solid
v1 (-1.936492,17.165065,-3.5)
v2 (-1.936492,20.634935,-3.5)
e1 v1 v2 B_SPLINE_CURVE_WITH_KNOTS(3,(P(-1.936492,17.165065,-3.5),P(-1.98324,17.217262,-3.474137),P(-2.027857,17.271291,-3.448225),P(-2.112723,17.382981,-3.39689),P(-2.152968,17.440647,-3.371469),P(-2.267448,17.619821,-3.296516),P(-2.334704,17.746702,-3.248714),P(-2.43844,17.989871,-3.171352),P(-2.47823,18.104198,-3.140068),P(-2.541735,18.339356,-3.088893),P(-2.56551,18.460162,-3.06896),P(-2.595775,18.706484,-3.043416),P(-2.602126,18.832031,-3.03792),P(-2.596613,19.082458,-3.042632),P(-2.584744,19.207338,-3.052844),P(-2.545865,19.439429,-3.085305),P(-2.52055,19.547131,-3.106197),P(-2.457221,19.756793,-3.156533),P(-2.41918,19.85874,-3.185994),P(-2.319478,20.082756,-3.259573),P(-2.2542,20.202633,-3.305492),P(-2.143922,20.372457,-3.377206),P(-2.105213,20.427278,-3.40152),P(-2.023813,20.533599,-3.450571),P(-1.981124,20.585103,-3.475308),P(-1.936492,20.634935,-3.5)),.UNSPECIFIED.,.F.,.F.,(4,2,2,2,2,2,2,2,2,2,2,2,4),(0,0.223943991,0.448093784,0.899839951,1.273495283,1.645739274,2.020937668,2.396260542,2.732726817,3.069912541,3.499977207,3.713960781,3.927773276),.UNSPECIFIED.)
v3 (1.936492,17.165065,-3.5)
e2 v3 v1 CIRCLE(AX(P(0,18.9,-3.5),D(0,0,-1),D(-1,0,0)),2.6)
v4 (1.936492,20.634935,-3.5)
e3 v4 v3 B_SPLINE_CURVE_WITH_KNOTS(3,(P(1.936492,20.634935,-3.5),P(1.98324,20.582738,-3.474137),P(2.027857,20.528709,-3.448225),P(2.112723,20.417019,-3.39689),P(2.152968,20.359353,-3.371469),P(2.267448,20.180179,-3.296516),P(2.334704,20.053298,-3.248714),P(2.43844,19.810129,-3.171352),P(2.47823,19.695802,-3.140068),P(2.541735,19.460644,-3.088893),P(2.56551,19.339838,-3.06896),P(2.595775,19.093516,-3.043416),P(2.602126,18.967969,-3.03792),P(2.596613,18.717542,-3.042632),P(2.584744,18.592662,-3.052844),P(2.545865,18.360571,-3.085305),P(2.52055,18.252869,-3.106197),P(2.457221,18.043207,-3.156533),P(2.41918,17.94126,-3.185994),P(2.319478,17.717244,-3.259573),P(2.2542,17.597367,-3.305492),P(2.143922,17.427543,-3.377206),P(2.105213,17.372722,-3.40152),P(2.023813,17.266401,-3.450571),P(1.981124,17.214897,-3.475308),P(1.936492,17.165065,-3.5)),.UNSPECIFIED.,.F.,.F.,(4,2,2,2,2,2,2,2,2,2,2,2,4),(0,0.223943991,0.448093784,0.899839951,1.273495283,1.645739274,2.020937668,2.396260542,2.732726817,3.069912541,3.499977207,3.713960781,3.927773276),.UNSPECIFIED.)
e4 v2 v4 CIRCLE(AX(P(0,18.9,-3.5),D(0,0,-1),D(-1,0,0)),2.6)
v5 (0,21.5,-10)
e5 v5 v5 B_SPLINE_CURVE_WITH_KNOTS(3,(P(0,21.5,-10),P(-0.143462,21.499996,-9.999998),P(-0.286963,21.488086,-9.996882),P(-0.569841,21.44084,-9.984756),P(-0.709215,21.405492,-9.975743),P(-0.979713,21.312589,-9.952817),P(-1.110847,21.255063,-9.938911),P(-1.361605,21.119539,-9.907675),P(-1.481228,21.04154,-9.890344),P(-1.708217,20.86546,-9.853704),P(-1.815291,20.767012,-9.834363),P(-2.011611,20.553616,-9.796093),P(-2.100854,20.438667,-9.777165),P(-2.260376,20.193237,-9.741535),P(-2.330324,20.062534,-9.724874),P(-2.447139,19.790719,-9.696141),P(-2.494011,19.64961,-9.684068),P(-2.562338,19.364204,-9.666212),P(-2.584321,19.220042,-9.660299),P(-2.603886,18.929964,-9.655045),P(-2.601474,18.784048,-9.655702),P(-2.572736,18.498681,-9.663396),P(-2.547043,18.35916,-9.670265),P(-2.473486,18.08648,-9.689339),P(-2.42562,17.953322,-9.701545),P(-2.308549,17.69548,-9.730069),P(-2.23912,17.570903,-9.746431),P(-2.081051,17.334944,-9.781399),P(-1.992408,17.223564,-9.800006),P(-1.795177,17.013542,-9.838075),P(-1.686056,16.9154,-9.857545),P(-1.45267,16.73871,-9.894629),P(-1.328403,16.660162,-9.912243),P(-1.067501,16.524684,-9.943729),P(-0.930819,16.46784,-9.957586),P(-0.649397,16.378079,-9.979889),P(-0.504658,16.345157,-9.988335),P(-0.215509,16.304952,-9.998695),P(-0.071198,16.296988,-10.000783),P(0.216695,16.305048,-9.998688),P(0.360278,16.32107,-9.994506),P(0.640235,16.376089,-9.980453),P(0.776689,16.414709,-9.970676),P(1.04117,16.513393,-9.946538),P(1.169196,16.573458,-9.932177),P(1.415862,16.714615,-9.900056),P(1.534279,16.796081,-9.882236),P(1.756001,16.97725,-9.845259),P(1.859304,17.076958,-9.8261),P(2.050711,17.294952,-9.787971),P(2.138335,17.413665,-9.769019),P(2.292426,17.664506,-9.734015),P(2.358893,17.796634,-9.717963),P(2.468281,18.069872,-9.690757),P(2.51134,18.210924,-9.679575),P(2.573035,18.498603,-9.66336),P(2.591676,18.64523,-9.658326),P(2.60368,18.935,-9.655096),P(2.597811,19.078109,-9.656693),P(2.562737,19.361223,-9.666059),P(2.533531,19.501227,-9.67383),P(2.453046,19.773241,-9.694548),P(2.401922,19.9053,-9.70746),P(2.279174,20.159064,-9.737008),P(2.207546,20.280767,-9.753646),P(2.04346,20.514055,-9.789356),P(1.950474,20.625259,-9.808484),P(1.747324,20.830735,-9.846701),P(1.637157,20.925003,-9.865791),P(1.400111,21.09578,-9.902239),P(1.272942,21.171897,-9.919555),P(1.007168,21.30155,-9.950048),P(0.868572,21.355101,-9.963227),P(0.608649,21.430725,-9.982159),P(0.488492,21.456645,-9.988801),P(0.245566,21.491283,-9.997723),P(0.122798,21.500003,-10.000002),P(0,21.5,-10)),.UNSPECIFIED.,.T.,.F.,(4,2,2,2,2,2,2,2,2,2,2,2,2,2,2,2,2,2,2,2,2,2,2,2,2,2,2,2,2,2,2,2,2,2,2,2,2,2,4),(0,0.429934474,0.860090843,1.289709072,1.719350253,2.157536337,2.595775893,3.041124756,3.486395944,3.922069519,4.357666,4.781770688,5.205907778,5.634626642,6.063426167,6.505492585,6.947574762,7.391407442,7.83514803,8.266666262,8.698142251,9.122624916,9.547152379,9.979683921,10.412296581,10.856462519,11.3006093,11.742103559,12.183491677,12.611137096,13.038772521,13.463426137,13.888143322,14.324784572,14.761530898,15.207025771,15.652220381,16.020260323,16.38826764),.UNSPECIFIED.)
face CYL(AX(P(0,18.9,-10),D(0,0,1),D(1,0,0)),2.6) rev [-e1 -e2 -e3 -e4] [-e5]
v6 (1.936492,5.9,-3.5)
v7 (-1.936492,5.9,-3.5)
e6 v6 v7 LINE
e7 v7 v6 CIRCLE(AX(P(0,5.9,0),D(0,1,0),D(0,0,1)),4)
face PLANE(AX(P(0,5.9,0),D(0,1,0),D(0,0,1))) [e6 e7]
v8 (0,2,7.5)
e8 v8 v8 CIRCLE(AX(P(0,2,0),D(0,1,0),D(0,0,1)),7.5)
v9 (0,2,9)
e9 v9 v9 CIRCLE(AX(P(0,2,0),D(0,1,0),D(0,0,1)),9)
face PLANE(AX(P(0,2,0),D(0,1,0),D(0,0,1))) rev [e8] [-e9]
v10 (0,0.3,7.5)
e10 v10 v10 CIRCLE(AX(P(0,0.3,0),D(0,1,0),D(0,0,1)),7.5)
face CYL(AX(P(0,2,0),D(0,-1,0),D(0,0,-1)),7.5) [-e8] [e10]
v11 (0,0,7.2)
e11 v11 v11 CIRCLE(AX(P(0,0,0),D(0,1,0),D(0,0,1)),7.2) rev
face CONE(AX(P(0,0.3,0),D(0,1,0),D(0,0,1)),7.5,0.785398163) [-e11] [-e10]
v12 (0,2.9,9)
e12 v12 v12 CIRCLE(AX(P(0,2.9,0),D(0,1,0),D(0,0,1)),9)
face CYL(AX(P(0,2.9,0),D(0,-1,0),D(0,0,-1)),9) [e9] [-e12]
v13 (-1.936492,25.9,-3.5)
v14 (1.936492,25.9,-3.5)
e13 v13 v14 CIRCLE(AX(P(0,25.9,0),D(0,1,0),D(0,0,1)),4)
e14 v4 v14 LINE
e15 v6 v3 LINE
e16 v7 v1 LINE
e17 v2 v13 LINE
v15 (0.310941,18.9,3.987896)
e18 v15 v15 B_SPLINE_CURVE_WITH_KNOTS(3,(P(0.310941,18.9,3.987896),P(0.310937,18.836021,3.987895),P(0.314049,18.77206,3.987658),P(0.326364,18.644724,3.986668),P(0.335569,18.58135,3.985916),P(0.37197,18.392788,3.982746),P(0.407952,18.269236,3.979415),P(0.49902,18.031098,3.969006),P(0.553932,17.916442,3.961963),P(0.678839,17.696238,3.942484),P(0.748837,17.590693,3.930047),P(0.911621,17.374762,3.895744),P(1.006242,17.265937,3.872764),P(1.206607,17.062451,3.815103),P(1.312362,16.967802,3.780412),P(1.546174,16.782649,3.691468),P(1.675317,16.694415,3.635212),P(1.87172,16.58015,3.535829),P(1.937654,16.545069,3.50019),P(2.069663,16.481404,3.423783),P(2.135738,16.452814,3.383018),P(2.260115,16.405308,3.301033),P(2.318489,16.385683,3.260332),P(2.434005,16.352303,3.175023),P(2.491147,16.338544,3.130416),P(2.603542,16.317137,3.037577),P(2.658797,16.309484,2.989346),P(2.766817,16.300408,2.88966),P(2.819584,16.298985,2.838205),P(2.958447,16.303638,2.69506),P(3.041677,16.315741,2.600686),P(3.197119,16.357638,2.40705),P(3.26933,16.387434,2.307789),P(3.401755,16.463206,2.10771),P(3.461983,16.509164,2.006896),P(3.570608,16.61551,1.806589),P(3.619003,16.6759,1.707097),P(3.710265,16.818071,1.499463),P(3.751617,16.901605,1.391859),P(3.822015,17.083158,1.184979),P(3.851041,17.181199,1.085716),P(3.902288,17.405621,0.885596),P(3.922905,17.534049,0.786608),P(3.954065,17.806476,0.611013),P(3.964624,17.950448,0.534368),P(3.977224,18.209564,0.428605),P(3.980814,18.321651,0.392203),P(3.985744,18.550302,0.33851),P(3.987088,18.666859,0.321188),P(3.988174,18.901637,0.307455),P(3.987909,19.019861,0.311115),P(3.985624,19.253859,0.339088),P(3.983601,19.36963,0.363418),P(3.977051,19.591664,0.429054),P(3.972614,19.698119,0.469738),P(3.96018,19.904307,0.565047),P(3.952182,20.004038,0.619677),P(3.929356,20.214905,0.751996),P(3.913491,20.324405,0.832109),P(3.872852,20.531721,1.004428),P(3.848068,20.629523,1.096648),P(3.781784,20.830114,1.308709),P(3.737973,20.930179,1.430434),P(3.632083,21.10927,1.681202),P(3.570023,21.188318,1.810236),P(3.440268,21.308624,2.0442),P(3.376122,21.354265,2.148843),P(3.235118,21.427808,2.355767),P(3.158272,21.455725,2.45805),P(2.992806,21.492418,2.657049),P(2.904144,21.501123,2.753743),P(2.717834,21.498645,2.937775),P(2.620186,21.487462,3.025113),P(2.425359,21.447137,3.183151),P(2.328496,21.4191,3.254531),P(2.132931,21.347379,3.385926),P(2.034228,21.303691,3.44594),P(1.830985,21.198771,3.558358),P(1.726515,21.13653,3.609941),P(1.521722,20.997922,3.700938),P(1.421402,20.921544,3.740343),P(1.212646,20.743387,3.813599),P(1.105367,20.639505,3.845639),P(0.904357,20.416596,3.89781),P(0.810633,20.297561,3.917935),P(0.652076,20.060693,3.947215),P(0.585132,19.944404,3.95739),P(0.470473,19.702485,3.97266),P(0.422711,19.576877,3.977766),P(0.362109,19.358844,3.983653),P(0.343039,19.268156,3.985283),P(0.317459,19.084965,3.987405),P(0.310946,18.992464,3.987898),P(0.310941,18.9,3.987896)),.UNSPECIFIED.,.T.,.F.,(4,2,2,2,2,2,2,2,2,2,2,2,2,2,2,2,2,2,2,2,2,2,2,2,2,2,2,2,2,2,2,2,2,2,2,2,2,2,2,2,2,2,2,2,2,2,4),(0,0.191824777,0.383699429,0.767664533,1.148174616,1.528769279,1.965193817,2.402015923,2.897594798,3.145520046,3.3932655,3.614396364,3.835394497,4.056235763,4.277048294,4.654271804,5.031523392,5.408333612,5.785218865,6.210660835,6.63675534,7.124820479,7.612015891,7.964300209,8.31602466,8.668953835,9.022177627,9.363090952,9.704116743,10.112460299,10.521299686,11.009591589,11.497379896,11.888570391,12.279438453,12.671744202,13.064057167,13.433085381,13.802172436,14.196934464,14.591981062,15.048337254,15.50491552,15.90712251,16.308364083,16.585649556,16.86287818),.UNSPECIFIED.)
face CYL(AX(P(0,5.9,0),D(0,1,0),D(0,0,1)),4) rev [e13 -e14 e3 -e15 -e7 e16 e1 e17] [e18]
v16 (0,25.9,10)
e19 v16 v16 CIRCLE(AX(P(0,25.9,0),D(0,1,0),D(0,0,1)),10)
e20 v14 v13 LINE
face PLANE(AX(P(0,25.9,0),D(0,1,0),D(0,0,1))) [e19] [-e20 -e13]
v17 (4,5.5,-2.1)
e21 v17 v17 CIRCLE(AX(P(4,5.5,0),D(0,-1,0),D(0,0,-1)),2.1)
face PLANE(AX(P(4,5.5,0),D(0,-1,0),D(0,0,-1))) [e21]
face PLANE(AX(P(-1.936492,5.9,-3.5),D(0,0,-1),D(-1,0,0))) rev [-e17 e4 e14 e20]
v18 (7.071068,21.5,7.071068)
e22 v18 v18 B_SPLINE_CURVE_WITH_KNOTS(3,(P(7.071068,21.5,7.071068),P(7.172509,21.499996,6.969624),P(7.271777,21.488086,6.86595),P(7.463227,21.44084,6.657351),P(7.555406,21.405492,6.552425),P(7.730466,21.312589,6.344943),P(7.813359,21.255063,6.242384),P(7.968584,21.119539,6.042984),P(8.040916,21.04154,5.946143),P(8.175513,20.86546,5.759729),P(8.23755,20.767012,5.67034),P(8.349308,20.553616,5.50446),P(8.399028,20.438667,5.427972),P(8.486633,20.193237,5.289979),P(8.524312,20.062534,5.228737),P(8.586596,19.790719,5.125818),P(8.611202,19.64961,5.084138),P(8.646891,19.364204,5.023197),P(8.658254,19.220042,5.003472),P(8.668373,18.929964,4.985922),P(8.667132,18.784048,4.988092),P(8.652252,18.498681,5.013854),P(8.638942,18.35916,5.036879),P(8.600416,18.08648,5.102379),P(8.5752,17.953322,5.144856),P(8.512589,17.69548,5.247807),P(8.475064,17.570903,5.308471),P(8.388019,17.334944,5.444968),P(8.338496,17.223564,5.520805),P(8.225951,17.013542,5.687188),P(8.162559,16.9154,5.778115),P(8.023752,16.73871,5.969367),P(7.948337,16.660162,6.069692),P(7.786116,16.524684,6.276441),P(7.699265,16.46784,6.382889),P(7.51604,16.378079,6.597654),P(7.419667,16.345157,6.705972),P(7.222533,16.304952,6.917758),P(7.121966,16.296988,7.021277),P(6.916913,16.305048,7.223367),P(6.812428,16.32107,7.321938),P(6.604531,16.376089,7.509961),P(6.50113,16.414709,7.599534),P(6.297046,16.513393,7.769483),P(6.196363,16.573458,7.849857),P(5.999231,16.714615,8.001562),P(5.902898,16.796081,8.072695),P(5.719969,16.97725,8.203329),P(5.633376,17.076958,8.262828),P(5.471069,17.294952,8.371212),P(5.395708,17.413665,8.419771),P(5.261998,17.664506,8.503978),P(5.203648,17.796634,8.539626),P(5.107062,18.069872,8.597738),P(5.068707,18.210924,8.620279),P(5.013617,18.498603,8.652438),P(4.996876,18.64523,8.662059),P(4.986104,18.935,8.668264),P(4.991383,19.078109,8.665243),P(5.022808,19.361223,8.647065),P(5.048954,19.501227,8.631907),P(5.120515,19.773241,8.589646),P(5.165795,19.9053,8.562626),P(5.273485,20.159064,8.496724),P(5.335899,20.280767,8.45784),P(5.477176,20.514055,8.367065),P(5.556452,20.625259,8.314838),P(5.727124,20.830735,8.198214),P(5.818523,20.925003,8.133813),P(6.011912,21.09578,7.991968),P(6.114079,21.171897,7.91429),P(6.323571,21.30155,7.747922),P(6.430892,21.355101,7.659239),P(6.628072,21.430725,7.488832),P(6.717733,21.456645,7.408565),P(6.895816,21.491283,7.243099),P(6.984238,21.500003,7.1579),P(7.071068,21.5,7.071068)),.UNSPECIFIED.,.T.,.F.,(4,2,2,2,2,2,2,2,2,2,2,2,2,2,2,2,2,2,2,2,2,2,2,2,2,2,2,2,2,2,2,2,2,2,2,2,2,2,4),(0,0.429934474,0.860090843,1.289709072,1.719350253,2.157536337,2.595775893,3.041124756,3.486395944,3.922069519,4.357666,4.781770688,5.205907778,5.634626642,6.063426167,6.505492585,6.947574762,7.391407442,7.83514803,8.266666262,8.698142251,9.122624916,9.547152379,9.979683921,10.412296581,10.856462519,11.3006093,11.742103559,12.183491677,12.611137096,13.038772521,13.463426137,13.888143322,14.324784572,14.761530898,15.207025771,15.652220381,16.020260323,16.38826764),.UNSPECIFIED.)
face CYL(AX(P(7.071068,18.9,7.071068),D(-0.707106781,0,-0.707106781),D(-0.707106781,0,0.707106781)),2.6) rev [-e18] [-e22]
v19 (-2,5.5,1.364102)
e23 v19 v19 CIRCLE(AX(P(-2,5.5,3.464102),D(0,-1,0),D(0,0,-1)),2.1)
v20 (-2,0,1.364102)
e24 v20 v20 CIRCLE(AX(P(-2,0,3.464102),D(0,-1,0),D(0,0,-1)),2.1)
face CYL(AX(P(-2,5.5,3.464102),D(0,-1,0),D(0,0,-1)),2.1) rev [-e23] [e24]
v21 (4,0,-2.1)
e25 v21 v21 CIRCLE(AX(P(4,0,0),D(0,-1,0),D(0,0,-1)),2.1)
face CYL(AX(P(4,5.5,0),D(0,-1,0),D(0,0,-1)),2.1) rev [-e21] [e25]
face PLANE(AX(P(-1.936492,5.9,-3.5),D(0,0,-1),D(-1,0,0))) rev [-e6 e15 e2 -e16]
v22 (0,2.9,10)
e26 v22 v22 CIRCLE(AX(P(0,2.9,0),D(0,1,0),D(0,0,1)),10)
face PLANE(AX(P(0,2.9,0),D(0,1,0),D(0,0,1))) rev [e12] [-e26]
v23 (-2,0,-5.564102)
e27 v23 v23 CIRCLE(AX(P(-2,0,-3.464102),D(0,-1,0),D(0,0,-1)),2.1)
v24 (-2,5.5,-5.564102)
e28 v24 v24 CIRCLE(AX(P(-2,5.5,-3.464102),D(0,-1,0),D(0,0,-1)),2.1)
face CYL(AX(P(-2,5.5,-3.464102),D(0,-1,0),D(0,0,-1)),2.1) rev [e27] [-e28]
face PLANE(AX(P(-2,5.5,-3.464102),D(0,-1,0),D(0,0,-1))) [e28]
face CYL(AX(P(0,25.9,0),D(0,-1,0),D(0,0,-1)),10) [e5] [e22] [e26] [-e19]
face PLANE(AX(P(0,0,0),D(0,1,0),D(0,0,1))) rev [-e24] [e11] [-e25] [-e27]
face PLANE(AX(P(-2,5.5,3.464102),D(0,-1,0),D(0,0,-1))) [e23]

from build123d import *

# Parameters (mm, degrees)
SKETCH1_R             = 7.5
BOSS_EXTRUDE1_DEPTH   = 2
SKETCH2_R             = 9
BOSS_EXTRUDE2_DEPTH   = 0.9
SKETCH3_R             = 10
BOSS_EXTRUDE3_DEPTH   = 23
SKETCH5_R             = 2.1
CUT_EXTRUDE1_DEPTH    = 5.5
CUT_EXTRUDE2_DEPTH    = 20
SKETCH7_R             = 2.6
CUT_EXTRUDE3_DEPTH    = 30.509489999
CIRPATTERN1_START     = 3.039736726
CIRPATTERN1_OUTLINE_R = 2.6
CIRPATTERN1_DEPTH     = 6.960263374
CHAMFER1_SIZE         = 0.3


# Read off the part's stored shape, not the designer's step: CirPattern1
with BuildPart() as part:
    # Sketch1 → Boss-Extrude1 (new body)
    with BuildSketch(Plane(origin=(0, 0, 0), x_dir=(1, 0, 0), z_dir=(0, 1, 0))):
        with Locations(Location((0, 0, 0), (0, 0, 270))):
            Circle(SKETCH1_R)
    extrude(amount=BOSS_EXTRUDE1_DEPTH)

    # Sketch2 → Boss-Extrude2 (add)
    with BuildSketch(Plane(origin=(0, 2, 0), x_dir=(1, 0, 0), z_dir=(0, 1, 0))):
        with Locations(Location((0, 0, 0), (0, 0, 270))):
            Circle(SKETCH2_R)
    extrude(amount=BOSS_EXTRUDE2_DEPTH)

    # Sketch3 → Boss-Extrude3 (add)
    with BuildSketch(Plane(origin=(0, 2.9, 0), x_dir=(1, 0, 0), z_dir=(0, 1, 0))):
        with Locations(Location((0, 0, 0), (0, 0, 270))):
            Circle(SKETCH3_R)
    extrude(amount=BOSS_EXTRUDE3_DEPTH)

    # Sketch5 → Cut-Extrude1 (cut)
    with BuildSketch(Plane.XZ):
        with Locations(Location((4, 0, 0), (0, 0, 270))):
            Circle(SKETCH5_R)
        with Locations(Location((-2, -3.464101615, 0), (0, 0, 270))):
            Circle(SKETCH5_R)
        with Locations(Location((-2, 3.464101615, 0), (0, 0, 270))):
            Circle(SKETCH5_R)
    extrude(amount=-CUT_EXTRUDE1_DEPTH, mode=Mode.SUBTRACT)

    # Sketch6 → Cut-Extrude2 (cut)
    with BuildSketch(Plane(origin=(0, 25.9, 0), x_dir=(1, 0, 0), z_dir=(0, 1, 0))):
        with BuildLine():
            Line((-1.936491673, 3.5), (1.936491673, 3.5))
            ThreePointArc((1.936491673, 3.5), (0, -4), (-1.936491673, 3.5))
        make_face()
    extrude(amount=-CUT_EXTRUDE2_DEPTH, mode=Mode.SUBTRACT)

    # Sketch7 → Cut-Extrude3 (cut, through all)
    with BuildSketch(Plane.XY):
        with Locations(Location((0, 18.9, 0), (0, 0, 318.14230882))):
            Circle(SKETCH7_R)
    extrude(amount=-CUT_EXTRUDE3_DEPTH, mode=Mode.SUBTRACT)

    # CirPattern1 outline → CirPattern1 (cut)
    with BuildSketch(Plane(origin=(0, 0, 0), x_dir=(0.7071067811865509, 0, -0.707106781186544), z_dir=(0.707106781186544, 0, 0.707106781186551)).offset(CIRPATTERN1_START)):
        with Locations((0, 18.9)):
            Circle(CIRPATTERN1_OUTLINE_R)
    extrude(amount=CIRPATTERN1_DEPTH, mode=Mode.SUBTRACT)

    # Chamfer1
    chamfer1_edges = [part.edges().sort_by_distance(p)[0] for p in [
        (0, 0, -7.5),
    ]]
    chamfer(chamfer1_edges, length=CHAMFER1_SIZE)


solid = part.part
